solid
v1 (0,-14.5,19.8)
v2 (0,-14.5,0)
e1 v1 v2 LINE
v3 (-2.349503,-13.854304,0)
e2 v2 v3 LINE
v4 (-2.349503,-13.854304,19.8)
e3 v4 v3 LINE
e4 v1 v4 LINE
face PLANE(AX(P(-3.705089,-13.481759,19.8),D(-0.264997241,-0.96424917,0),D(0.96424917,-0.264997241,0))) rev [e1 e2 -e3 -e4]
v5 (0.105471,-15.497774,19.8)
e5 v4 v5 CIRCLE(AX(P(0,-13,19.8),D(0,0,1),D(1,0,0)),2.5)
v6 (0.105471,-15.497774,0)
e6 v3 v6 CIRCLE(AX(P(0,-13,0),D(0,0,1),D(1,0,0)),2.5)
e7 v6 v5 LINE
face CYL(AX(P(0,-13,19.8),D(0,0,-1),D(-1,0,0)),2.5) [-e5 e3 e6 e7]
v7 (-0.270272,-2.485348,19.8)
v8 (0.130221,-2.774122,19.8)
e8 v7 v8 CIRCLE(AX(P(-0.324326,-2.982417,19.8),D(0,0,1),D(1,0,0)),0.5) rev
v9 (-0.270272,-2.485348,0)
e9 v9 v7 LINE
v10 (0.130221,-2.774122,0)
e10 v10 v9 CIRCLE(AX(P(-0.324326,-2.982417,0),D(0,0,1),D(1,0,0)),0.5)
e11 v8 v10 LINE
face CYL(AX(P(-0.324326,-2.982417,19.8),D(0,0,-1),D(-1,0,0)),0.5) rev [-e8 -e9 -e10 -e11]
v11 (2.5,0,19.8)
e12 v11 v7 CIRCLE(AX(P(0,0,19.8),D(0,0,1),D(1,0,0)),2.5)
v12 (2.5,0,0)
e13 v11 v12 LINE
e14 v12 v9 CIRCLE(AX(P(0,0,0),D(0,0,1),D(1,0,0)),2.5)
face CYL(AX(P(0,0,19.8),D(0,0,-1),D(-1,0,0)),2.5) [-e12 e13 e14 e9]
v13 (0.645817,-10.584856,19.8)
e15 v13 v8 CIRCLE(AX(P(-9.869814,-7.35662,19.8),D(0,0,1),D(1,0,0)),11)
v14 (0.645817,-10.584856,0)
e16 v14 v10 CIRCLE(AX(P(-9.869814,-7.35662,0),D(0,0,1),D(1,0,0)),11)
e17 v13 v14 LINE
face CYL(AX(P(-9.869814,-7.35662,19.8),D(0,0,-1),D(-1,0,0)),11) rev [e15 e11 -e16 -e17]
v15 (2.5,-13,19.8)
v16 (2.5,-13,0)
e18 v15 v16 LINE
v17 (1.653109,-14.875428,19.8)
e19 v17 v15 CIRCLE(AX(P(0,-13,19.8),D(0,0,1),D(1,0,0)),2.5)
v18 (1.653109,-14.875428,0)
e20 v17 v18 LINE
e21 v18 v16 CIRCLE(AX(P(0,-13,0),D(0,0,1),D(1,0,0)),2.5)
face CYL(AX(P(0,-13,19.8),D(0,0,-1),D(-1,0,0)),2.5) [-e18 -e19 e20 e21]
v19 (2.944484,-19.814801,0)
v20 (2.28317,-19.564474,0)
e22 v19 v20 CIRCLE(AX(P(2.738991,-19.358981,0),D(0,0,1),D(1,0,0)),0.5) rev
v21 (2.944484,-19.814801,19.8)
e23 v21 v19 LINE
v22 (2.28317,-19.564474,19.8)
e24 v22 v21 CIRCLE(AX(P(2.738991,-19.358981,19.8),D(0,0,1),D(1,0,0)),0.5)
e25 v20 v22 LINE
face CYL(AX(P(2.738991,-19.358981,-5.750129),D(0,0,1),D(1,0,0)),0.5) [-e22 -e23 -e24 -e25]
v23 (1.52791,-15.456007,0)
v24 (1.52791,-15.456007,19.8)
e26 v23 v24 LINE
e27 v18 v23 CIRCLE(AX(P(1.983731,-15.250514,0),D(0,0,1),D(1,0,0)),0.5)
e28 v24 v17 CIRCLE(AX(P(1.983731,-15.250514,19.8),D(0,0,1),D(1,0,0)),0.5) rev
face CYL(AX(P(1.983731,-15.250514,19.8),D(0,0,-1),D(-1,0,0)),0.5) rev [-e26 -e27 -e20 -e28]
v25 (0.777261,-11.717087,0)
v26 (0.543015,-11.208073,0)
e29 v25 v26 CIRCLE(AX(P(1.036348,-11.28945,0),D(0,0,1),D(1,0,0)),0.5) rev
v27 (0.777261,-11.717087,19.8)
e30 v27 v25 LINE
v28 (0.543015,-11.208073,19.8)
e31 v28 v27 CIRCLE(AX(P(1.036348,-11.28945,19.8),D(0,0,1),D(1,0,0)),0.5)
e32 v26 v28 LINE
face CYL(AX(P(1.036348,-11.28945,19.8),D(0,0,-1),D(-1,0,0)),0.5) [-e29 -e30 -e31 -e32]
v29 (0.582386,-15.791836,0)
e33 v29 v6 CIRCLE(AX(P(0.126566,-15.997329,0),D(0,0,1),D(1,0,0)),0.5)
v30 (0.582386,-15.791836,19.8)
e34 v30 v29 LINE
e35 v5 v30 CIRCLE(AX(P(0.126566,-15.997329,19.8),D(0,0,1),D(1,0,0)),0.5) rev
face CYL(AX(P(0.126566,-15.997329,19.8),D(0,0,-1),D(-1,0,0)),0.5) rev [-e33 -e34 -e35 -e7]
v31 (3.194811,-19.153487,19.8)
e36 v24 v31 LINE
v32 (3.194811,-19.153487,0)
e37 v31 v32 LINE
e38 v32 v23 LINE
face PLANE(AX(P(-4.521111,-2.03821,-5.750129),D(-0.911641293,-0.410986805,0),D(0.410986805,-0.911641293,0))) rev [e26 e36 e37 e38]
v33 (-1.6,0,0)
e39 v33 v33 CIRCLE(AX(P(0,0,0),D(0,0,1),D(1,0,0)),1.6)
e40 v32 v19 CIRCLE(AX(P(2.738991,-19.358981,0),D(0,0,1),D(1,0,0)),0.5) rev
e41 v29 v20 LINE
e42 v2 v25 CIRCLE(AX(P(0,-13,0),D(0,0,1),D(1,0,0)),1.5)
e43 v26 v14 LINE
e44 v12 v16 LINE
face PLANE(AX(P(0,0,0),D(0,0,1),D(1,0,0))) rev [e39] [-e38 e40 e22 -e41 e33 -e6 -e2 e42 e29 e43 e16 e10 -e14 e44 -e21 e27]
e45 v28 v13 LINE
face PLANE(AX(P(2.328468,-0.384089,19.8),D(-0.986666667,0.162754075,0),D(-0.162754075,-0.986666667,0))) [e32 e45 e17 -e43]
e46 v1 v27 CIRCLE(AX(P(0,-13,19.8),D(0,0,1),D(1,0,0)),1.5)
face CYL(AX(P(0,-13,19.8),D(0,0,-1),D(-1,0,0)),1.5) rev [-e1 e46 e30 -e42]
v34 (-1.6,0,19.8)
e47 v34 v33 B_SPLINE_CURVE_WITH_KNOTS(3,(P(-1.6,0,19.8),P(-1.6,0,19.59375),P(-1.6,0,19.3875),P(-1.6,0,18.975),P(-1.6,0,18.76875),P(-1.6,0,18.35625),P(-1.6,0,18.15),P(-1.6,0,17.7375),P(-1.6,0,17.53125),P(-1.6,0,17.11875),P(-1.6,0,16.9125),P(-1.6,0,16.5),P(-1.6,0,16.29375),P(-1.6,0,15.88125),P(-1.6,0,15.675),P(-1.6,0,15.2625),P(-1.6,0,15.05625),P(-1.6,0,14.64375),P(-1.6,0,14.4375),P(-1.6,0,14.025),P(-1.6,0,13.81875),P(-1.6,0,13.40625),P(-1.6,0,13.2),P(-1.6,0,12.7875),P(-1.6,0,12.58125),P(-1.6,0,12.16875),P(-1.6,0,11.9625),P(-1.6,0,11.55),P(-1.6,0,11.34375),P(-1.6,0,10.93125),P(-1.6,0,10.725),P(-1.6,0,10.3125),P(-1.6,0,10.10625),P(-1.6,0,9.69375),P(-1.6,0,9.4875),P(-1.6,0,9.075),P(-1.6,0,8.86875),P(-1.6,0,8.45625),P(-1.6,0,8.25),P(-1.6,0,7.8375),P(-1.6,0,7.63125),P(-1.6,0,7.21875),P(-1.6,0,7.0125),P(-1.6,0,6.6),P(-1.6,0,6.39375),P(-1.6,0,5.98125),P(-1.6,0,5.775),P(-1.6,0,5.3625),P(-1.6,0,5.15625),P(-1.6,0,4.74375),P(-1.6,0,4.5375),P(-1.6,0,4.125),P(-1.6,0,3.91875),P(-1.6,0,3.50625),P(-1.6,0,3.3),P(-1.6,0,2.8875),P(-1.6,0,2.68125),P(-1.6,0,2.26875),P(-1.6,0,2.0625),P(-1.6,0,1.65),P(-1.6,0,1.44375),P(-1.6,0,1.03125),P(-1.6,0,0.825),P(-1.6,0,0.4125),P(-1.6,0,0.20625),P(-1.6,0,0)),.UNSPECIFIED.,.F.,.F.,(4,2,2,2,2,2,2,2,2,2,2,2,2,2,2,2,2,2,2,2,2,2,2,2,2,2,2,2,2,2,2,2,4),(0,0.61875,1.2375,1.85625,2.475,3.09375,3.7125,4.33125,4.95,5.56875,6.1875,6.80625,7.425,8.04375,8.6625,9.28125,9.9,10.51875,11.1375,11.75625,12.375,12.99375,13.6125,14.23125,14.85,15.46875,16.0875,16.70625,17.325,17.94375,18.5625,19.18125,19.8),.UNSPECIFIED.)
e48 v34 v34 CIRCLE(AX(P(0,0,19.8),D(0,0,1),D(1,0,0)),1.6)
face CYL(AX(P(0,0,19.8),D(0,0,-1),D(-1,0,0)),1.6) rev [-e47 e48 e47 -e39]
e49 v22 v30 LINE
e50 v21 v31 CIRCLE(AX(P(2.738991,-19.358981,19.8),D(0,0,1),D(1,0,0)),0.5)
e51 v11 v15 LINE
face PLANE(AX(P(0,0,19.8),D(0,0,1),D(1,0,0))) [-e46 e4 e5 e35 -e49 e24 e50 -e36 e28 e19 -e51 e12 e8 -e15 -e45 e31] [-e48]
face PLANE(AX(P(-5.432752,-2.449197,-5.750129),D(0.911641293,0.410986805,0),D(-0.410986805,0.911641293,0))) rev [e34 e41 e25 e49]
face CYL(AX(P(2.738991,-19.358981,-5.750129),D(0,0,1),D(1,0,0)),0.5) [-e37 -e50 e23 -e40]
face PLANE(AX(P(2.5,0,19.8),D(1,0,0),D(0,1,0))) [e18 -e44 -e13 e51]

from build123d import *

# Parameters (mm, degrees)
SKETCH1_R           = 2.5
SKETCH1_R_2         = 1.6
BOSS_EXTRUDE1_DEPTH = 19.8
FILLET1_R           = 0.5
BOSS_EXTRUDE2_START = -19.8
BOSS_EXTRUDE2_DEPTH = 19.8
FILLET2_R           = 0.5


with BuildPart() as part:
    # Sketch1 → Boss-Extrude1 (new body)
    # profile 1 of 5: a face of its own
    with BuildSketch(Plane.XY):
        Circle(SKETCH1_R)
        with Locations(Location((0, 0, 0), (0, 0, 180))):
            Circle(SKETCH1_R_2, mode=Mode.SUBTRACT)
    # profile 2 of 5: a face of its own
    with BuildSketch(Plane.XY):
        with BuildLine():
            Line((2.5, -13), (2.5, 0))
            ThreePointArc((2.5, 0), (1.767766953, -1.767766953), (0, -2.5))
            ThreePointArc((0, -2.5), (1.095258289, -6.480732801), (0.645816542, -10.584855906))
            ThreePointArc((0.645816542, -10.584855906), (1.98299538, -11.477590948), (2.5, -13))
        make_face()
    # profile 3 of 5: a face of its own
    with BuildSketch(Plane.XY):
        with BuildLine():
            ThreePointArc((-2.228856339, -14.132342448), (0.582176585, -15.431269303), (2.5, -13))
            ThreePointArc((2.5, -13), (1.98299538, -11.477590948), (0.645816542, -10.584855906))
            Line((0.645816542, -10.584855906), (0.481752062, -11.579466667))
            ThreePointArc((0.481752062, -11.579466667), (1.48, -13.244131112), (0, -14.5))
            ThreePointArc((0, -14.5), (-0.244131112, -14.48), (-0.481752062, -14.420533333))
            Line((-0.481752062, -14.420533333), (-2.228856339, -14.132342448))
        make_face()
    # profile 4 of 5: a face of its own
    with BuildSketch(Plane.XY):
        with BuildLine():
            Line((0, -14.5), (-0.481752062, -14.420533333))
            ThreePointArc((-0.481752062, -14.420533333), (-0.244131112, -14.48), (0, -14.5))
        make_face()
    # profile 5 of 5: a face of its own
    with BuildSketch(Plane.XY):
        with BuildLine():
            ThreePointArc((-2.34950307, -13.854304), (-2.293397058, -13.995153222), (-2.228856339, -14.132342448))
            Line((-2.228856339, -14.132342448), (-0.481752062, -14.420533333))
            Line((-0.481752062, -14.420533333), (0, -14.5))
            Line((0, -14.5), (-2.34950307, -13.854304))
        make_face()
    extrude(amount=BOSS_EXTRUDE1_DEPTH)

    # Fillet1
    fillet1_edges = [part.edges().sort_by_distance(p)[0] for p in [
        (0.481752062, -11.579466667, 9.9),
        (0, -2.5, 9.9),
    ]]
    fillet(fillet1_edges, radius=FILLET1_R)

    # Sketch2 → Boss-Extrude2 (add)
    with BuildSketch(Plane.XY.offset(19.8).offset(BOSS_EXTRUDE2_START)):
        with BuildLine():
            Line((3.400304681, -19.609307967), (1.36493731, -15.094503793))
            ThreePointArc((1.36493731, -15.094503793), (0.917921591, -15.325385979), (0.433729366, -15.462088308))
            Line((0.433729366, -15.462088308), (2.488663388, -20.020294772))
            Line((2.488663388, -20.020294772), (3.400304681, -19.609307967))
        make_face()
    extrude(amount=BOSS_EXTRUDE2_DEPTH)

    # Fillet2
    fillet2_edges = [part.edges().sort_by_distance(p)[0] for p in [
        (0.433729366, -15.462088308, 9.9),
        (1.36493731, -15.094503793, 9.9),
        (3.400304681, -19.609307967, 9.9),
        (2.488663388, -20.020294772, 9.9),
    ]]
    fillet(fillet2_edges, radius=FILLET2_R - 0.0001)  # a hair under: the kernel refuses the full size


solid = part.part
